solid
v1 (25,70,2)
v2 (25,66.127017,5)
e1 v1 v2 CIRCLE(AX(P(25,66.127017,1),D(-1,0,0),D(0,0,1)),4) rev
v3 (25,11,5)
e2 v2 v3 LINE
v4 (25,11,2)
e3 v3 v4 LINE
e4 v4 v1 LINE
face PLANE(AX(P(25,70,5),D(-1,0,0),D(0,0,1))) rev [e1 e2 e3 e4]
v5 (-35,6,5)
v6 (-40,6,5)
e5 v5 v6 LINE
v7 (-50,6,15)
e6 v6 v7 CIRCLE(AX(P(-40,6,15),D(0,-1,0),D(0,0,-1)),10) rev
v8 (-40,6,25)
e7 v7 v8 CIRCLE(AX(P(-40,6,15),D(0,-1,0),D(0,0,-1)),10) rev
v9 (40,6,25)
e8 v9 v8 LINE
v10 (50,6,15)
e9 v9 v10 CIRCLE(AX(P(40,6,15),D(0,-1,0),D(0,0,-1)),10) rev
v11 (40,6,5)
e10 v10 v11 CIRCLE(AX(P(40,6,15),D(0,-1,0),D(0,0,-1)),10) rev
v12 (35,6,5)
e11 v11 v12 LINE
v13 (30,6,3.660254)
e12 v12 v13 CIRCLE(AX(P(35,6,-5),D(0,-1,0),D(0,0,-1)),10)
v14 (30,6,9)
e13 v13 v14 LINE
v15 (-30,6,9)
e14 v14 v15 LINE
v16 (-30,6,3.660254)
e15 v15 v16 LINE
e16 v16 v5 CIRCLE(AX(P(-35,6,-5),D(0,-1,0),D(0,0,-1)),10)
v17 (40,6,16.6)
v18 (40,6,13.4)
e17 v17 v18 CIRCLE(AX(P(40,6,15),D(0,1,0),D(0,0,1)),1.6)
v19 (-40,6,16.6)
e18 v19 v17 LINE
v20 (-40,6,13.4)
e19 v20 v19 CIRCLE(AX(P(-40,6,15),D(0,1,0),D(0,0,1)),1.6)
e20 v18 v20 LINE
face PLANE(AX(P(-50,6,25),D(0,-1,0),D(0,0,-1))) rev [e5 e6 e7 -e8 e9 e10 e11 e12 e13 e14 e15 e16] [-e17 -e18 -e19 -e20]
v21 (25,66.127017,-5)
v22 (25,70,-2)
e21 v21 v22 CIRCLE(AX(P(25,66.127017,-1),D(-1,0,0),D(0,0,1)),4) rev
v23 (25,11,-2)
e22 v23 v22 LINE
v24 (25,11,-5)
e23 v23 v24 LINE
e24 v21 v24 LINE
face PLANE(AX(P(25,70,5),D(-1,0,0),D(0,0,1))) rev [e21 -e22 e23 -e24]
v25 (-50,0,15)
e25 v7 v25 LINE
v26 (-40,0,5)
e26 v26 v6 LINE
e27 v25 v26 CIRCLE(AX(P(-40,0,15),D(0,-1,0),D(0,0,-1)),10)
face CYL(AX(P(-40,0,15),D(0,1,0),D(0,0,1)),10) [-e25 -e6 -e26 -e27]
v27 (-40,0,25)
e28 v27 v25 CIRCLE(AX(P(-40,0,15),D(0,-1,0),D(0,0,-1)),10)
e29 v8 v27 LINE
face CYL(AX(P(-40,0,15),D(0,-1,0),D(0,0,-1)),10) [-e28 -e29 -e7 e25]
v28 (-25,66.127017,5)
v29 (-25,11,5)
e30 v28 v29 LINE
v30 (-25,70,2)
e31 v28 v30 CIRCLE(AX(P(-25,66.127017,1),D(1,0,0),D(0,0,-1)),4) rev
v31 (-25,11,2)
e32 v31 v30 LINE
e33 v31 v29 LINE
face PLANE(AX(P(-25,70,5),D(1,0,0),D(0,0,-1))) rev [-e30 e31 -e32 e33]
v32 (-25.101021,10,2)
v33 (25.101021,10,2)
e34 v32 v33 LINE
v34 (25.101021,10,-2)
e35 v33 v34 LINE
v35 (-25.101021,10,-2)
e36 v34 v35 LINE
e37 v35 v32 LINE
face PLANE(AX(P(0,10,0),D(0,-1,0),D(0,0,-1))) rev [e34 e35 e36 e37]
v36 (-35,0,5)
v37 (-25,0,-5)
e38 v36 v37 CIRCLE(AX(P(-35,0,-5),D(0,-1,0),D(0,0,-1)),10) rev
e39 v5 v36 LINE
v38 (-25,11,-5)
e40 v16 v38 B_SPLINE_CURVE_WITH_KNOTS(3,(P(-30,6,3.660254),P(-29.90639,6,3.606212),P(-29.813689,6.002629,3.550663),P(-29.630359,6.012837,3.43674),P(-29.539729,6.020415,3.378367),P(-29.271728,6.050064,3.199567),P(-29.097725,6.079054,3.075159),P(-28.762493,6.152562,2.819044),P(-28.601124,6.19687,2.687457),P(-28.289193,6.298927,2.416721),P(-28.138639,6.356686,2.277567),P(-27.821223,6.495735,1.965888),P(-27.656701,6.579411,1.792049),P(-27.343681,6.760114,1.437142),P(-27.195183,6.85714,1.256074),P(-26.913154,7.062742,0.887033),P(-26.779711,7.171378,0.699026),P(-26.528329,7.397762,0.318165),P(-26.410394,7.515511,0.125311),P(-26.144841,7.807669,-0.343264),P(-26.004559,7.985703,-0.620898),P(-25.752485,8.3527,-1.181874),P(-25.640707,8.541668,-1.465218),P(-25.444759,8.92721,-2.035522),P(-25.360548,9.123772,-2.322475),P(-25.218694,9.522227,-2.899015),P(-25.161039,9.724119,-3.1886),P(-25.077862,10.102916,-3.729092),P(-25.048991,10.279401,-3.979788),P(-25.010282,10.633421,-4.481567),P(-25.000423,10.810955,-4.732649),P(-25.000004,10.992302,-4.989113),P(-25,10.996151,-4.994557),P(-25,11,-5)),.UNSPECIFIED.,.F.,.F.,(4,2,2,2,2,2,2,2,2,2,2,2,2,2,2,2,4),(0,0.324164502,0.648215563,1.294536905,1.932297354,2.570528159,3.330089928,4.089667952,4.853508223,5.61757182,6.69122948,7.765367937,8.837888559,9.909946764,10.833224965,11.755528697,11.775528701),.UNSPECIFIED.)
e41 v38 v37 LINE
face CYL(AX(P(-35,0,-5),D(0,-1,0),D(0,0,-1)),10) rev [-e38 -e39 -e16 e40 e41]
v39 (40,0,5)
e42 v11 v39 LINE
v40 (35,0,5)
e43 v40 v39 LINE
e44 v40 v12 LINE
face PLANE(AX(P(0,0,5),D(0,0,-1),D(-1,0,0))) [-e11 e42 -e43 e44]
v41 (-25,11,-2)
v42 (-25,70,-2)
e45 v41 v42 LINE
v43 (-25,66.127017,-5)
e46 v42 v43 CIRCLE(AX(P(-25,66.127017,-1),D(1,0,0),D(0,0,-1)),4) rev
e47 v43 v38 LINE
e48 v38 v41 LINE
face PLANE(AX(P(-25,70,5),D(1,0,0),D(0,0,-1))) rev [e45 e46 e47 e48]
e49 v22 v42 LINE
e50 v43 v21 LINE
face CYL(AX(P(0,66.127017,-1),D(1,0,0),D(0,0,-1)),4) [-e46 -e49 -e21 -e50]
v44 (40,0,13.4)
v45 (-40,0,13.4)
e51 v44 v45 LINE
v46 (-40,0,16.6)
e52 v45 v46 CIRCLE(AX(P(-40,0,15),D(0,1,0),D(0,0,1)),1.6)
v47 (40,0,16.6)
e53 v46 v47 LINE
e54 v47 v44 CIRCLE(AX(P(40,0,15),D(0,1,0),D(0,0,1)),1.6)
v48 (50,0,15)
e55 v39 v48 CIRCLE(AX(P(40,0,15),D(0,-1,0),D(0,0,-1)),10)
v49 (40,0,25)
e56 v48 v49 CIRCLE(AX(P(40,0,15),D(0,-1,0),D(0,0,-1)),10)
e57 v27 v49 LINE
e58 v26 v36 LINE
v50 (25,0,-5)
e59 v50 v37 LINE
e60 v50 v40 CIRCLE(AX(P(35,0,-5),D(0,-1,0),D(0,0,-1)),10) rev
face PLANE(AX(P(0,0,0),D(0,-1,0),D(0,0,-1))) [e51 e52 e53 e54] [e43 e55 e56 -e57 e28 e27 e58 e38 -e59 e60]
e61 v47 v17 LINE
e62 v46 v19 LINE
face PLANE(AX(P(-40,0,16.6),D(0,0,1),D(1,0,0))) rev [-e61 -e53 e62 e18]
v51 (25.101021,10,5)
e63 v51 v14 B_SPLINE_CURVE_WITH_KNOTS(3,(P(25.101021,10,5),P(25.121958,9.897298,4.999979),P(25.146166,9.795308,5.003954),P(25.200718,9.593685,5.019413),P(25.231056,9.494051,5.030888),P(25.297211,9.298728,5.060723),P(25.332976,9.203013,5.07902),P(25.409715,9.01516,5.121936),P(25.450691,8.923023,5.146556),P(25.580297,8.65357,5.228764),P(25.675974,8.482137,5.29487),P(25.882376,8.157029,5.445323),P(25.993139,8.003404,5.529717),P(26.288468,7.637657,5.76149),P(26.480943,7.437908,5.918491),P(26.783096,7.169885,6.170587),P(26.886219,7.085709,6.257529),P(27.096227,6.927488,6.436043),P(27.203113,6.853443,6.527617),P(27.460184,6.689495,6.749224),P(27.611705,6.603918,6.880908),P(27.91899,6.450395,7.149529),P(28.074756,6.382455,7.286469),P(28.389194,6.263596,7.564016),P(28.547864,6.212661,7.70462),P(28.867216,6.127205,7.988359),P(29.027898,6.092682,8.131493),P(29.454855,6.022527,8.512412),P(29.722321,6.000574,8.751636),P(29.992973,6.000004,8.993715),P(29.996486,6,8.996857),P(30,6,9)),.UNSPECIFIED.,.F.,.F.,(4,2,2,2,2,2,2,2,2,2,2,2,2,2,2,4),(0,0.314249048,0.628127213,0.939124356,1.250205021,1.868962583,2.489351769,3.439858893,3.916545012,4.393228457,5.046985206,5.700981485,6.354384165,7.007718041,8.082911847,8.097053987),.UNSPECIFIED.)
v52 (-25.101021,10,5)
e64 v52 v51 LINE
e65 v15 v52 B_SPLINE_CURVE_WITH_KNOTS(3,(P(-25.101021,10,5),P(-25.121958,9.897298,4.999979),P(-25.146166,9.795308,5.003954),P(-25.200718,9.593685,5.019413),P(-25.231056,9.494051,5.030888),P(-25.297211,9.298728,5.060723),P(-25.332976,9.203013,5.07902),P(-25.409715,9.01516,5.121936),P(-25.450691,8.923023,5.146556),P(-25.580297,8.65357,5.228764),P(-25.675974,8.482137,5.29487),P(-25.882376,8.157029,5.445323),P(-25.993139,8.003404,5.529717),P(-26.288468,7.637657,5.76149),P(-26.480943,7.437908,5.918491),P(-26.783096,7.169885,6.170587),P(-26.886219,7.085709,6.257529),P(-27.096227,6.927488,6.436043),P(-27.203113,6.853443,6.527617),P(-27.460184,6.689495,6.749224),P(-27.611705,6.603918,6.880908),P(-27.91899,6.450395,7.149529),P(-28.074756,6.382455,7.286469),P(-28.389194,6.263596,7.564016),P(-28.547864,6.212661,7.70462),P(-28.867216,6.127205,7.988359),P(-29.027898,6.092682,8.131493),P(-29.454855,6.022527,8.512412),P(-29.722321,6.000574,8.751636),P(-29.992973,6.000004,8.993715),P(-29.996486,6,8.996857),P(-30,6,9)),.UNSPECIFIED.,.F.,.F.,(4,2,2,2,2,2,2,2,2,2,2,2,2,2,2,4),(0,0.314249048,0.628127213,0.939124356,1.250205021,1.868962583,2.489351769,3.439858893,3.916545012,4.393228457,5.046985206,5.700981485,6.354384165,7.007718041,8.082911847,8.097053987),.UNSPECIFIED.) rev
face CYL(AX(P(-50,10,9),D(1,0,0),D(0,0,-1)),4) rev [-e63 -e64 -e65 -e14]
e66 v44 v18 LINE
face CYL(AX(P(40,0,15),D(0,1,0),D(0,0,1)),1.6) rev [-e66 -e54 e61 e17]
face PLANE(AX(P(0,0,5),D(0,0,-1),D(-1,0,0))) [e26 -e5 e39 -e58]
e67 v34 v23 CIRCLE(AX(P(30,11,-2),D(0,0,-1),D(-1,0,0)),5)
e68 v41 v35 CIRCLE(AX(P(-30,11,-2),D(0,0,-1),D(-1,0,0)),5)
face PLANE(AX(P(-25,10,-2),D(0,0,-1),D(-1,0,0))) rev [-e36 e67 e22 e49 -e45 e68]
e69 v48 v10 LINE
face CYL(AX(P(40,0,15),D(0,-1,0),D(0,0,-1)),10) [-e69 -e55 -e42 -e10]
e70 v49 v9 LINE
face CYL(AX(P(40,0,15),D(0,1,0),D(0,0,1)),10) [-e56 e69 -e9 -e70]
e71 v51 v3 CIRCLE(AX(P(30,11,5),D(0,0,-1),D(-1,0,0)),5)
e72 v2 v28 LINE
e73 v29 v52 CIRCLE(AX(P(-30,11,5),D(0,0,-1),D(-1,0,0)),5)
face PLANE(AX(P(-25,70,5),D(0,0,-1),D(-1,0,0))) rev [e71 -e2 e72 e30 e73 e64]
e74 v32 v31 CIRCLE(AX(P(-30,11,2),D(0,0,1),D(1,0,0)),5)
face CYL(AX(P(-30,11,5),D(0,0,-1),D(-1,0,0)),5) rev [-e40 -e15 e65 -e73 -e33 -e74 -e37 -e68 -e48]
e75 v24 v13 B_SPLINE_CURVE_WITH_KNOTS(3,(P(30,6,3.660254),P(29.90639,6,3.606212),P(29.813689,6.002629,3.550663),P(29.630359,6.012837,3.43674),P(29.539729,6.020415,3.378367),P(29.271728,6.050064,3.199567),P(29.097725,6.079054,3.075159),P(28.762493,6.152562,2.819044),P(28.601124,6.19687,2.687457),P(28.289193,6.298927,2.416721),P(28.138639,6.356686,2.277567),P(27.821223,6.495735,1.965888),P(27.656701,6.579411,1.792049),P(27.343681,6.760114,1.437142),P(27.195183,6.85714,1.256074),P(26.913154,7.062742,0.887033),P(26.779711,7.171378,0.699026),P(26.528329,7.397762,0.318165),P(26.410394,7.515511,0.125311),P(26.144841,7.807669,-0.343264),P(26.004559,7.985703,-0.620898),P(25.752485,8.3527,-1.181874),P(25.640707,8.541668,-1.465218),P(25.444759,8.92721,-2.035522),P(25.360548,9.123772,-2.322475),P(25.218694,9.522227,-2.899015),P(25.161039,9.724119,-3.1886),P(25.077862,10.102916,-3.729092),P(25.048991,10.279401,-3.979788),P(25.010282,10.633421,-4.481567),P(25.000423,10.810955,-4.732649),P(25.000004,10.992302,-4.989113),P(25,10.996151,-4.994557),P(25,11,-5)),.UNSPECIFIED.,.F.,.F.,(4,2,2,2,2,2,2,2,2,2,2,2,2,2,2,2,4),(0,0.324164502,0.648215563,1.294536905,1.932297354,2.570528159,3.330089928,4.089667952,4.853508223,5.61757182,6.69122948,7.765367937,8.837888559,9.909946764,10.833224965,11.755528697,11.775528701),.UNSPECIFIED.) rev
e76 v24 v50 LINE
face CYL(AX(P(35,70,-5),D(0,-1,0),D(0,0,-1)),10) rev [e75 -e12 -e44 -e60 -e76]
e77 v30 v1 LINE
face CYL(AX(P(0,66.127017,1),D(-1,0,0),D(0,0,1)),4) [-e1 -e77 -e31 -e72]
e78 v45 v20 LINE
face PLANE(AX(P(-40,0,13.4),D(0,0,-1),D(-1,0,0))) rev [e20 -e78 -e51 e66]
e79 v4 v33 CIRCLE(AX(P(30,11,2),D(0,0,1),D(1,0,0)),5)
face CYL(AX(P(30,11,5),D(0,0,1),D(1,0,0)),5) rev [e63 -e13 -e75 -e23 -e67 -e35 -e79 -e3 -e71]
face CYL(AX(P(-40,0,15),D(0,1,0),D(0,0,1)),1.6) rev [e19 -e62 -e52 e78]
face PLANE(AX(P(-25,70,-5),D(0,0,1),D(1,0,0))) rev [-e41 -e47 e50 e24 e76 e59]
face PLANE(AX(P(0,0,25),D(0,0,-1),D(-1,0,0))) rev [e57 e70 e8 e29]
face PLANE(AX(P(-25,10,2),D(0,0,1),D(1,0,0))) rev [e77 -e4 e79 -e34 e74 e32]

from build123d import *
from build123d.topology import SkipClean

# Parameters (mm, degrees)
SKETCH1_W           = 50
SKETCH1_H           = 10
BOSS_EXTRUDE1_DEPTH = 70
SKETCH2_W           = 50
SKETCH2_H           = 4
CUT_EXTRUDE1_DEPTH  = 60
SKETCH3_W           = 100
SKETCH3_H           = 6
BOSS_EXTRUDE2_DEPTH = 20
FILLET1_R           = 10
FILLET2_R           = 10
FILLET3_R           = 5
CUT_EXTRUDE2_DEPTH  = 85.976467331
FILLET4_R           = 4
FILLET5_R           = 4


# Some blends are built 0.0001 mm under size
with BuildPart() as part:
    # Sketch1 → Boss-Extrude1 (new body)
    with BuildSketch(Plane(origin=(0, 0, 0), x_dir=(1, 0, 0), z_dir=(0, 1, 0))):
        Rectangle(SKETCH1_W, SKETCH1_H)
    extrude(amount=BOSS_EXTRUDE1_DEPTH)

    # Sketch2 → Cut-Extrude1 (cut)
    with BuildSketch(Plane(origin=(0, 70, 0), x_dir=(1, 0, 0), z_dir=(0, 1, 0))):
        Rectangle(SKETCH2_W, SKETCH2_H)
    extrude(amount=-CUT_EXTRUDE1_DEPTH, mode=Mode.SUBTRACT)

    # Sketch3 → Boss-Extrude2 (add)
    with BuildSketch(Plane.XY.offset(5)):
        with Locations((0, 3)):
            Rectangle(SKETCH3_W, SKETCH3_H)
    extrude(amount=BOSS_EXTRUDE2_DEPTH)

    # Fillet1
    fillet1_edges = [part.edges().sort_by_distance(p)[0] for p in [
        (50, 3, 25),
        (-50, 3, 25),
        (-50, 3, 5),
        (50, 3, 5),
    ]]
    fillet(fillet1_edges, radius=FILLET1_R - 0.0001)  # a hair under: the kernel refuses the full size

    # Fillet2
    fillet2_edges = [part.edges().sort_by_distance(p)[0] for p in [
        (-25, 3, 5),
        (25, 3, 5),
    ]]
    fillet(fillet2_edges, radius=FILLET2_R - 0.0001)  # a hair under: the kernel refuses the full size

    # Fillet3
    # the kernel refuses this fillet: 5 mm, written as the material it adds along each edge
    with BuildSketch(Plane(origin=(-25, 6, 5), x_dir=(-1, 0, 0), z_dir=(0, 0, -1))) as fillet3_piece_1_section:
        with BuildLine():
            CenterArc((FILLET3_R, FILLET3_R), FILLET3_R, 180, 90)
            Line((0, FILLET3_R), (0, 0))
            Line((0, 0), (FILLET3_R, 0))
        make_face()
    fillet3_piece_1 = extrude(amount=22.4999, mode=Mode.PRIVATE)
    fillet3_piece_1 = fillet3_piece_1 - Plane(origin=(-34.9999, 7.107412722, -4.9999), x_dir=(0, 0, 1), z_dir=(0, 1, 0)) * Cylinder(9.9999, 65, mode=Mode.PRIVATE)
    fillet3_piece_1 = split(fillet3_piece_1, bisect_by=Plane(origin=(-26.097313128, 7.107412722, -5), z_dir=(0, 0, 1)), keep=Keep.TOP, mode=Mode.PRIVATE)
    fillet3_piece_1 = split(fillet3_piece_1, bisect_by=Plane(origin=(-26.097313128, 10, 3.51164162), z_dir=(0, -1, 0)), keep=Keep.TOP, mode=Mode.PRIVATE)
    add(fillet3_piece_1)
    with BuildSketch(Plane(origin=(-25, 6, 5), x_dir=(-1, 0, 0), z_dir=(0, 0, -1))) as fillet3_piece_2_section:
        with BuildLine():
            CenterArc((FILLET3_R, FILLET3_R), FILLET3_R, 180, 90)
            Line((0, FILLET3_R), (0, 0))
            Line((0, 0), (FILLET3_R, 0))
        make_face()
    fillet3_piece_2 = extrude(amount=22.4999, mode=Mode.PRIVATE)
    fillet3_piece_2 = split(fillet3_piece_2, bisect_by=Plane(origin=(-25.030252938, 10, 3.5), z_dir=(0, 1, 0)), keep=Keep.TOP, mode=Mode.PRIVATE)
    fillet3_piece_2 = split(fillet3_piece_2, bisect_by=Plane(origin=(-25.030252938, 10.249492121, 2), z_dir=(0, 0, 1)), keep=Keep.TOP, mode=Mode.PRIVATE)
    add(fillet3_piece_2)
    with BuildSketch(Plane(origin=(-25, 6, 17.5), x_dir=(-1, 0, 0), z_dir=(0, 0, -1))) as fillet3_piece_3_section:
        with BuildLine():
            CenterArc((FILLET3_R, FILLET3_R), FILLET3_R, 180, 90)
            Line((0, FILLET3_R), (0, 0))
            Line((0, 0), (FILLET3_R, 0))
        make_face()
    fillet3_piece_3 = extrude(amount=34.9999, mode=Mode.PRIVATE)
    fillet3_piece_3 = fillet3_piece_3 - Plane(origin=(-34.9999, 10.264980521, -4.9999), x_dir=(0, 0, 1), z_dir=(0, 1, 0)) * Cylinder(9.9999, 90, mode=Mode.PRIVATE)
    fillet3_piece_3 = split(fillet3_piece_3, bisect_by=Plane(origin=(-25.027128676, 10.264980521, -5), z_dir=(0, 0, 1)), keep=Keep.TOP, mode=Mode.PRIVATE)
    fillet3_piece_3 = split(fillet3_piece_3, bisect_by=Plane(origin=(-25.027128676, 10.264980521, -2), z_dir=(0, 0, -1)), keep=Keep.TOP, mode=Mode.PRIVATE)
    add(fillet3_piece_3)
    with BuildSketch(Plane(origin=(25, 6, 5), x_dir=(1, 0, 0), z_dir=(0, 0, -1))) as fillet3_piece_4_section:
        with BuildLine():
            CenterArc((FILLET3_R, -FILLET3_R), FILLET3_R, 90, 90)
            Line((0, -FILLET3_R), (0, 0))
            Line((0, 0), (FILLET3_R, 0))
        make_face()
    fillet3_piece_4 = extrude(amount=22.4999, mode=Mode.PRIVATE)
    fillet3_piece_4 = fillet3_piece_4 - Plane(origin=(34.9999, 7.107412722, -4.9999), x_dir=(0, 0, 1), z_dir=(0, 1, 0)) * Cylinder(9.9999, 65, mode=Mode.PRIVATE)
    fillet3_piece_4 = split(fillet3_piece_4, bisect_by=Plane(origin=(26.097313128, 7.107412722, -5), z_dir=(0, 0, 1)), keep=Keep.TOP, mode=Mode.PRIVATE)
    fillet3_piece_4 = split(fillet3_piece_4, bisect_by=Plane(origin=(26.097313128, 10, 3.51164162), z_dir=(0, -1, 0)), keep=Keep.TOP, mode=Mode.PRIVATE)
    add(fillet3_piece_4)
    with BuildSketch(Plane(origin=(25, 6, 5), x_dir=(1, 0, 0), z_dir=(0, 0, -1))) as fillet3_piece_5_section:
        with BuildLine():
            CenterArc((FILLET3_R, -FILLET3_R), FILLET3_R, 90, 90)
            Line((0, -FILLET3_R), (0, 0))
            Line((0, 0), (FILLET3_R, 0))
        make_face()
    fillet3_piece_5 = extrude(amount=22.4999, mode=Mode.PRIVATE)
    fillet3_piece_5 = split(fillet3_piece_5, bisect_by=Plane(origin=(25.030252938, 10, 3.5), z_dir=(0, 1, 0)), keep=Keep.TOP, mode=Mode.PRIVATE)
    fillet3_piece_5 = split(fillet3_piece_5, bisect_by=Plane(origin=(25.030252938, 10.249492121, 2), z_dir=(0, 0, 1)), keep=Keep.TOP, mode=Mode.PRIVATE)
    add(fillet3_piece_5)
    with BuildSketch(Plane(origin=(25, 6, 17.5), x_dir=(1, 0, 0), z_dir=(0, 0, -1))) as fillet3_piece_6_section:
        with BuildLine():
            CenterArc((FILLET3_R, -FILLET3_R), FILLET3_R, 90, 90)
            Line((0, -FILLET3_R), (0, 0))
            Line((0, 0), (FILLET3_R, 0))
        make_face()
    fillet3_piece_6 = extrude(amount=34.9999, mode=Mode.PRIVATE)
    fillet3_piece_6 = fillet3_piece_6 - Plane(origin=(34.9999, 10.264980521, -4.9999), x_dir=(0, 0, 1), z_dir=(0, 1, 0)) * Cylinder(9.9999, 90, mode=Mode.PRIVATE)
    fillet3_piece_6 = split(fillet3_piece_6, bisect_by=Plane(origin=(25.027128676, 10.264980521, -5), z_dir=(0, 0, 1)), keep=Keep.TOP, mode=Mode.PRIVATE)
    fillet3_piece_6 = split(fillet3_piece_6, bisect_by=Plane(origin=(25.027128676, 10.264980521, -2), z_dir=(0, 0, -1)), keep=Keep.TOP, mode=Mode.PRIVATE)
    add(fillet3_piece_6)

    # Sketch4 → Cut-Extrude2 (cut, through all)
    with SkipClean():  # the faces are left unmerged after this step: merging them gives an invalid solid
        with BuildSketch(Plane(origin=(0, 6, 0), x_dir=(1, 0, 0), z_dir=(0, 1, 0))):
            with BuildLine():
                Line((-40, -13.4), (40, -13.4))
                ThreePointArc((40, -13.4), (41.6, -15), (40, -16.6))
                Line((40, -16.6), (-40, -16.6))
                ThreePointArc((-40, -16.6), (-41.6, -15), (-40, -13.4))
            make_face()
        extrude(amount=-CUT_EXTRUDE2_DEPTH, mode=Mode.SUBTRACT)
    add(part.part.scale(1), mode=Mode.REPLACE)  # the faces are merged on a copy

    # Fillet4
    # the kernel refuses this fillet: 4 mm, written as the material it takes off along each edge
    with BuildSketch(Plane(origin=(-34.682458366, 70, 5), x_dir=(0, -1, 0), z_dir=(1, 0, 0))) as fillet4_piece_1:
        with BuildLine():
            CenterArc((3.872983346, 4), FILLET4_R, 194.477512186, 75.522487814)
            Line((0, 3), (-0.077459667, 2.98))
            ThreePointArc((-0.077459667, 2.98), (-0.08, 1.5), (-0.08, 0))
            Line((-0.08, 0), (0, -0.08))
            Line((0, -0.08), (3.872983346, -0.08))
            Line((3.872983346, -0.08), (3.872983346, 0))
        make_face()
    extrude(amount=69.364916731, mode=Mode.SUBTRACT)
    with BuildSketch(Plane(origin=(34.682458366, 70, -5), x_dir=(0, 0, 1), z_dir=(-1, 0, 0))) as fillet4_piece_2:
        with BuildLine():
            CenterArc((4, -3.872983346), FILLET4_R, 104.477512186, 75.522487814)
            Line((0, -3.872983346), (-0.08, -3.872983346))
            Line((-0.08, -3.872983346), (-0.08, 0))
            Line((-0.08, 0), (0, 0.08))
            ThreePointArc((0, 0.08), (1.5, 0.08), (2.98, 0.077459667))
            Line((2.98, 0.077459667), (3, 0))
        make_face()
    extrude(amount=69.364916731, mode=Mode.SUBTRACT)

    # Fillet5
    fillet5_edges = [part.edges().sort_by_distance(p)[0] for p in [
        (0, 6, 5),
    ]]
    fillet(fillet5_edges, radius=FILLET5_R)


solid = part.part
